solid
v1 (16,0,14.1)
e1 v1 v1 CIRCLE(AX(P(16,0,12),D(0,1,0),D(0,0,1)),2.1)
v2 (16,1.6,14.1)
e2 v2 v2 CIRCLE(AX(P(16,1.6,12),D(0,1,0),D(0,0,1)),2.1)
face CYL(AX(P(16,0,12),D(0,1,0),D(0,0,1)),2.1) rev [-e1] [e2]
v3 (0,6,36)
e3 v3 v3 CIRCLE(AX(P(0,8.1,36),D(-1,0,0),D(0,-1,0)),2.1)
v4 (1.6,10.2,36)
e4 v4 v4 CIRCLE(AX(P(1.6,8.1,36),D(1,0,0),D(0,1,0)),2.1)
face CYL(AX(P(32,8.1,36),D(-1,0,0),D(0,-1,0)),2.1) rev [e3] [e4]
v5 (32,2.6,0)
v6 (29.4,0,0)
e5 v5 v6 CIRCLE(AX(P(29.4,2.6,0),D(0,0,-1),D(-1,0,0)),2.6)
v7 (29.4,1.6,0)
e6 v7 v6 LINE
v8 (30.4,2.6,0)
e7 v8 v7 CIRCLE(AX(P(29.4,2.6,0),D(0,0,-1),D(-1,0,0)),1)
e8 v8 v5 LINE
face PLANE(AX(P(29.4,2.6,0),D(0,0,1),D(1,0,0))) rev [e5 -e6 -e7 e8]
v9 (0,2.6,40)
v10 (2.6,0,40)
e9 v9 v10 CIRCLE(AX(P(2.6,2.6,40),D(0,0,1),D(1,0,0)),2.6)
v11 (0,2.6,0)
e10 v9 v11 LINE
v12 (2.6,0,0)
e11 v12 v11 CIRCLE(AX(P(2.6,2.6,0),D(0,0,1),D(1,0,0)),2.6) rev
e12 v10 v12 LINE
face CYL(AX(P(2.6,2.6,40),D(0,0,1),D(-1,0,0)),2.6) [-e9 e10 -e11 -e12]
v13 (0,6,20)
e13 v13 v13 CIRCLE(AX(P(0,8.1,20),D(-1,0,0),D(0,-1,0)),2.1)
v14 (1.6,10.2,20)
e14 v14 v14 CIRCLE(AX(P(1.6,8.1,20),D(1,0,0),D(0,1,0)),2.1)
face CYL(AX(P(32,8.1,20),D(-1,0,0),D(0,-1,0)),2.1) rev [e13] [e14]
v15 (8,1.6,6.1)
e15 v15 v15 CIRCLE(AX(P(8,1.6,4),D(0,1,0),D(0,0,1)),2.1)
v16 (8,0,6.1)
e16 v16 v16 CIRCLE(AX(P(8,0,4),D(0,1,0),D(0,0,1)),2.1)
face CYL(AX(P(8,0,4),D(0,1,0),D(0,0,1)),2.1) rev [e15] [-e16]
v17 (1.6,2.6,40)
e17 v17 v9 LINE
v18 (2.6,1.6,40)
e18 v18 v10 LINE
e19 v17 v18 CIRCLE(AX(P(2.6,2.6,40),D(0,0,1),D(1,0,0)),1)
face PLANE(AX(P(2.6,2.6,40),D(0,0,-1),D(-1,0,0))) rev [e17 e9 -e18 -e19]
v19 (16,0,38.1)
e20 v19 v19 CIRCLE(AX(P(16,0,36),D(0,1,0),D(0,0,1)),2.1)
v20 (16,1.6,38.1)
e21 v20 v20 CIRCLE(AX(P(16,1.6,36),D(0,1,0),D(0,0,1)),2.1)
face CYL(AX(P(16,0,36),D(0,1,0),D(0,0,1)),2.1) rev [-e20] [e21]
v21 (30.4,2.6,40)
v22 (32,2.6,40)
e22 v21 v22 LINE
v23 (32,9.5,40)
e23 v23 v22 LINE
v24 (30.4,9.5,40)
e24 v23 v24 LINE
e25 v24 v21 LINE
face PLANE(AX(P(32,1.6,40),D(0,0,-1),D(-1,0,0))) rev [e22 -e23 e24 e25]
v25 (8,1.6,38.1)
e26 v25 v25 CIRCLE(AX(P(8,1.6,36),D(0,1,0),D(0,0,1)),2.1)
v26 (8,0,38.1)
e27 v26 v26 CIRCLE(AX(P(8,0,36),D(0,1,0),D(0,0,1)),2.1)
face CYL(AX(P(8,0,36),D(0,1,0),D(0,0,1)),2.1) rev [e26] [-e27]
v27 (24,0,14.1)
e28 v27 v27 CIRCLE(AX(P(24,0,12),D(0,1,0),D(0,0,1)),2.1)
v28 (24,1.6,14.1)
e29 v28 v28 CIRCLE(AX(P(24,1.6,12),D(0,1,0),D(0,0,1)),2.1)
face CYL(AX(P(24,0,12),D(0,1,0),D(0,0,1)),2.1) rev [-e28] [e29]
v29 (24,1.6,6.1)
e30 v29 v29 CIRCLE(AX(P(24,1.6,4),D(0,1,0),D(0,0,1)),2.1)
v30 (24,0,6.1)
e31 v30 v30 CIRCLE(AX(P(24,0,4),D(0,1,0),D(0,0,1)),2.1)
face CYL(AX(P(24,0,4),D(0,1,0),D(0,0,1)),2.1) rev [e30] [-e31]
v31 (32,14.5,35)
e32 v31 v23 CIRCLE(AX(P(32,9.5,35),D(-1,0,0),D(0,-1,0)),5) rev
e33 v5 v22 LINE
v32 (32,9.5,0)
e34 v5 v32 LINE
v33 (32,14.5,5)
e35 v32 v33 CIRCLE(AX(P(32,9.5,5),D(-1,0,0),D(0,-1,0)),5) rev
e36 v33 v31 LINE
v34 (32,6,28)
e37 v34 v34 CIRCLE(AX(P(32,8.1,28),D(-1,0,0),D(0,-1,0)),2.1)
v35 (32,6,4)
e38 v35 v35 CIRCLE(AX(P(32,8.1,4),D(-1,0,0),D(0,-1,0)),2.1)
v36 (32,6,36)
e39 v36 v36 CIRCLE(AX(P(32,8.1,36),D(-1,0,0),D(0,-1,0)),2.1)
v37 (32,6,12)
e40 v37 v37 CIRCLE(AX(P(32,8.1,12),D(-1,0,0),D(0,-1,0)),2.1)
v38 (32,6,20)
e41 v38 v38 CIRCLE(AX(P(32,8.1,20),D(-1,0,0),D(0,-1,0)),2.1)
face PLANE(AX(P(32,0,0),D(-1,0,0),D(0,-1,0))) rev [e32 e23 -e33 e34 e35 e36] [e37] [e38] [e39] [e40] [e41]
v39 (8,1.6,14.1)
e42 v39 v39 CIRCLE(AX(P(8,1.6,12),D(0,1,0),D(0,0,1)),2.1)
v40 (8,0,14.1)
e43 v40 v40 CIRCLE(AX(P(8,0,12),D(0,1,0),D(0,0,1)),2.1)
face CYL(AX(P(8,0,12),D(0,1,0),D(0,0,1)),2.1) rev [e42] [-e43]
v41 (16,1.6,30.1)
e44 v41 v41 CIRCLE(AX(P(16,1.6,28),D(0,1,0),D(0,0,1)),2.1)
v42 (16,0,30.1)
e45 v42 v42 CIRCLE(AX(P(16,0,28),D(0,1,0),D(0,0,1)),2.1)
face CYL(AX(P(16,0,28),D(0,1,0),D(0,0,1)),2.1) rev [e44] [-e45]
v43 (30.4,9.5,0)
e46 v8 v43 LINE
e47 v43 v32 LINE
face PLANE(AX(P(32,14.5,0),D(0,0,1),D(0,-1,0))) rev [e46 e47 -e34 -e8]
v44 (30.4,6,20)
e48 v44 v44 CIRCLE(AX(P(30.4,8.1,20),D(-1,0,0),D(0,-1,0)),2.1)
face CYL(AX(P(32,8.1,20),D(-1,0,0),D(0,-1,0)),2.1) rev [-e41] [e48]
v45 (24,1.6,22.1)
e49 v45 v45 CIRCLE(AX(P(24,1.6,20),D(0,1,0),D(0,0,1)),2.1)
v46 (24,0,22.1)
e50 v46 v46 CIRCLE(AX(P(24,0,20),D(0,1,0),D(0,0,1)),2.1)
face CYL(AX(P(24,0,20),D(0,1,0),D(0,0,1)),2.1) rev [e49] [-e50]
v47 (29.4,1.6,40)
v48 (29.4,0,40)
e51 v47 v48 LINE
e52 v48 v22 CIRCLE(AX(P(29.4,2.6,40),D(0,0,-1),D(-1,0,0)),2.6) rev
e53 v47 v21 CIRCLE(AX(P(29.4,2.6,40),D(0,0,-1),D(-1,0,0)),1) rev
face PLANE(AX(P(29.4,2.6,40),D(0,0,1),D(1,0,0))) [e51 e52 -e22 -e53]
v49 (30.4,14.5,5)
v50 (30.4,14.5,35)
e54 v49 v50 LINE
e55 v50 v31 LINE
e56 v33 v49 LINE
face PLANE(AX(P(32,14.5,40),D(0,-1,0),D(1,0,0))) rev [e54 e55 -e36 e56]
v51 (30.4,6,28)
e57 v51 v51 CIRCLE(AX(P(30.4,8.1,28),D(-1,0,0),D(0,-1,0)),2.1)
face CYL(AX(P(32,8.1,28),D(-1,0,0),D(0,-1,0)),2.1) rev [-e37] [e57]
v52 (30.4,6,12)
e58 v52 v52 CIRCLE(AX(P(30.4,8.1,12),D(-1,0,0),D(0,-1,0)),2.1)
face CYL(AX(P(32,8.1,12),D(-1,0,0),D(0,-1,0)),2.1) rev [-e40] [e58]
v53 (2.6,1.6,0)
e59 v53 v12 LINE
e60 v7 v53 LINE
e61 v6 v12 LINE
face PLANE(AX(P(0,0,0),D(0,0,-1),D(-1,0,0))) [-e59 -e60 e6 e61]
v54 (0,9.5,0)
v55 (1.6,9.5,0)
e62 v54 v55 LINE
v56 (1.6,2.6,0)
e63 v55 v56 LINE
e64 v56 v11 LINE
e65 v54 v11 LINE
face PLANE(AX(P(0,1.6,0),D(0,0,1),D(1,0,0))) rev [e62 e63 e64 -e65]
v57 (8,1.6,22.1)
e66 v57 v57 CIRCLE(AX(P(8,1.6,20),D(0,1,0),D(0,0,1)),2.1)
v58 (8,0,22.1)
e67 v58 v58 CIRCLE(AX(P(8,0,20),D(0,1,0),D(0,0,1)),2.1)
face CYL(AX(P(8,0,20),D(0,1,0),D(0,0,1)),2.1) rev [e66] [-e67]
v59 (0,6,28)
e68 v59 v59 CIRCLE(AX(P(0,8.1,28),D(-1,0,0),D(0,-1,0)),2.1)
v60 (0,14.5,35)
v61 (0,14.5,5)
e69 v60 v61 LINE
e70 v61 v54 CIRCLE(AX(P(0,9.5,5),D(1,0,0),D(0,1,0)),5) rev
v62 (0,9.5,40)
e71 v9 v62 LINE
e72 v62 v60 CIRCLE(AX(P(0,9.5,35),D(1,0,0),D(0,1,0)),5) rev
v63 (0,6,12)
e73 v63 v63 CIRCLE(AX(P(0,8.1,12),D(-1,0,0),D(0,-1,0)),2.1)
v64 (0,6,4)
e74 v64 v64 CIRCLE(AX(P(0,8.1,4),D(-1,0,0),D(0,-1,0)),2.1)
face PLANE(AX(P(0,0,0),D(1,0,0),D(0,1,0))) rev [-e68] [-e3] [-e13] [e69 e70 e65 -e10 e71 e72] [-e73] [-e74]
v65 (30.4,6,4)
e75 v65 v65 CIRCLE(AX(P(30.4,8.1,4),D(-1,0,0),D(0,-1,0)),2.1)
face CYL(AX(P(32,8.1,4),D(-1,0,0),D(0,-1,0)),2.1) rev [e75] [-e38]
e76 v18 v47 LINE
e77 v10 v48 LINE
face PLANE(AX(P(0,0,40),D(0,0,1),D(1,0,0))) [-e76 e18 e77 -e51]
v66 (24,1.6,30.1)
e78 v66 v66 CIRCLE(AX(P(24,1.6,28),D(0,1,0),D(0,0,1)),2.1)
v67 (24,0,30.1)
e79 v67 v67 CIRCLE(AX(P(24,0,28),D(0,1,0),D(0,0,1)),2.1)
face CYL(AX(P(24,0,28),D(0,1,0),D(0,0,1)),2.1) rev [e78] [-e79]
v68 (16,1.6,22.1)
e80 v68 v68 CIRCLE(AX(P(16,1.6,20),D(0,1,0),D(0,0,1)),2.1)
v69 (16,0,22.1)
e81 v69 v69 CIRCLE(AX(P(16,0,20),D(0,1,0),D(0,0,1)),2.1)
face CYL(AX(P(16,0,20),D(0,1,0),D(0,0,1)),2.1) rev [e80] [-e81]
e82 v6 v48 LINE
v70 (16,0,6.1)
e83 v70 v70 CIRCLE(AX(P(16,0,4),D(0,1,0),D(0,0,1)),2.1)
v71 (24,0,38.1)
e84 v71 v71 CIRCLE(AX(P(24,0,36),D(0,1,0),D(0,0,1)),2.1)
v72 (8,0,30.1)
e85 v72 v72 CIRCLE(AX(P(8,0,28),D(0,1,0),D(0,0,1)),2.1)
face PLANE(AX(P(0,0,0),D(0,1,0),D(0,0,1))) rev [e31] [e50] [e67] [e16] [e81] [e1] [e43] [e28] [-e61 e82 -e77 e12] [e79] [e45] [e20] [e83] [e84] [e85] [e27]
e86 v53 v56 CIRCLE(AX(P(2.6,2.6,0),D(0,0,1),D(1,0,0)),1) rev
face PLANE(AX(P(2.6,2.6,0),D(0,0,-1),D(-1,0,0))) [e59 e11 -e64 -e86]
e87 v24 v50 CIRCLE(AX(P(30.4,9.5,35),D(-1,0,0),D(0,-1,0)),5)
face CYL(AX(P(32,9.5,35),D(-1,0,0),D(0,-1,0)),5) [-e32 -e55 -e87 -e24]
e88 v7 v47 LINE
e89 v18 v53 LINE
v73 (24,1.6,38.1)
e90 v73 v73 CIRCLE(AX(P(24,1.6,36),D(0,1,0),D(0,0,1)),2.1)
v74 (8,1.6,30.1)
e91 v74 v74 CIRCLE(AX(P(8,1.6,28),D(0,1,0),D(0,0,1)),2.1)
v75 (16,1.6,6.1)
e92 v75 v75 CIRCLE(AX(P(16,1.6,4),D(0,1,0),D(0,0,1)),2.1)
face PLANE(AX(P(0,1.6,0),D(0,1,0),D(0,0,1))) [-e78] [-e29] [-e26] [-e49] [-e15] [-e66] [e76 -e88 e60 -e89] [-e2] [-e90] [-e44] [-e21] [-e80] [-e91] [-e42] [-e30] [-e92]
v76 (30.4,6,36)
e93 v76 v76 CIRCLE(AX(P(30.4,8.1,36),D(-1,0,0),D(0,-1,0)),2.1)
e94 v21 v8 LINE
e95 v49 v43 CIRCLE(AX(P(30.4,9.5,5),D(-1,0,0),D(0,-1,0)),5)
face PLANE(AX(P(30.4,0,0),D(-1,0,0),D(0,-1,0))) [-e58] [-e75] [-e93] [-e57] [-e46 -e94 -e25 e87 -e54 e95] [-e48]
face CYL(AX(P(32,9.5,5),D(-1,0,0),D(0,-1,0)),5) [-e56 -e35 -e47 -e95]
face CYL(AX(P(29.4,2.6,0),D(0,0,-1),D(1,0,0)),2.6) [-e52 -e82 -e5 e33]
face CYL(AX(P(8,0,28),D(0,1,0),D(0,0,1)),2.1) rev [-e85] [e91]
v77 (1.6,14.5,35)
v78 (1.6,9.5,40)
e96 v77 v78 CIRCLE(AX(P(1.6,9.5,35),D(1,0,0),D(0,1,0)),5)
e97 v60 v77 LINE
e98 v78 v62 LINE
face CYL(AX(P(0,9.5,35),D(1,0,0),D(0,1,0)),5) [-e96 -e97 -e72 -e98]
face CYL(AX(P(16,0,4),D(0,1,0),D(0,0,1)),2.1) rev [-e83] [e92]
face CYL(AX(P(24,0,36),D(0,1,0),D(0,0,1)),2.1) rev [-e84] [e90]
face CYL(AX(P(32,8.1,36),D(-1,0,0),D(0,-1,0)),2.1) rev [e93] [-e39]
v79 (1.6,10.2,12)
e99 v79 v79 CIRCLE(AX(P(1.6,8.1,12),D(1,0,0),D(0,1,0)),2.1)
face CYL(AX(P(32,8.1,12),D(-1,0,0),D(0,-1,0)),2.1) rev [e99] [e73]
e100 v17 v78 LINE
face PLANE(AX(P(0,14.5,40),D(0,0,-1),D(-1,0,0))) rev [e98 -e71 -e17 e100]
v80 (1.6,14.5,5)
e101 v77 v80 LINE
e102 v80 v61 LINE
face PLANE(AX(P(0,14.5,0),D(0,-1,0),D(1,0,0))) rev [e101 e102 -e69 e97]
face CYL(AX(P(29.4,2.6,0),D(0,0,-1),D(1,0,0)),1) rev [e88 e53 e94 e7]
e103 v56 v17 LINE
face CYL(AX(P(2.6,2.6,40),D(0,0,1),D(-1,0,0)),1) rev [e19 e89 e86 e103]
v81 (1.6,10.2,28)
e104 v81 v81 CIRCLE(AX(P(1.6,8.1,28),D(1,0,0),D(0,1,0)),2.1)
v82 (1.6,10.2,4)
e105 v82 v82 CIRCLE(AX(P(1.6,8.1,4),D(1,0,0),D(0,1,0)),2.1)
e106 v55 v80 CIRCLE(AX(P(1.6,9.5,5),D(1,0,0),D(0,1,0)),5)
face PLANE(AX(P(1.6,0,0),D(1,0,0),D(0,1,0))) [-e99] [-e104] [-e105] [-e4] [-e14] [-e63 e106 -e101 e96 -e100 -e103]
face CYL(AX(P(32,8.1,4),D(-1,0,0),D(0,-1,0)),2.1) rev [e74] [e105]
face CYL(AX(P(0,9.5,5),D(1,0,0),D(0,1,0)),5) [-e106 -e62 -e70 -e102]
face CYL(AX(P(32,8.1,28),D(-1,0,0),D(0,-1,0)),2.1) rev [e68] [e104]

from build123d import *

# Parameters (mm, degrees)
SKETCH1_W                      = 32
SKETCH1_H                      = 40
BOSS_EXTRUDE1_DEPTH            = 1.6
SKETCH2_R                      = 2.1
CUT_EXTRUDE1_DEPTH             = 52.24997561
LPATTERN1_COUNT                = 3
LPATTERN1_PITCH                = 8
LPATTERN1_COUNT_DIR2           = 5
LPATTERN1_PITCH_DIR2           = 8
EDGE_FLANGE1_STRIP_W           = 8.4
EDGE_FLANGE1_STRIP_H           = 1.6
EDGE_FLANGE1_STRIP_CUT_DEPTH   = 40
EDGE_FLANGE1_STRIP_2_W         = 8.4
EDGE_FLANGE1_STRIP_2_H         = 1.6
EDGE_FLANGE1_STRIP_CUT_2_DEPTH = 40
EDGE_FLANGE1_DEPTH             = 40
EDGE_FLANGE1_BEND_DEPTH        = 40
FILLET1_R                      = 5
SKETCH14_R                     = 2.1
CUT_EXTRUDE2_DEPTH             = 54.23767463
LPATTERN2_COUNT                = 5
LPATTERN2_PITCH                = 8


# Sheet-metal steps are written as plain solids
with BuildPart() as part:
    # Sketch1 → Boss-Extrude1 (new body)
    with BuildSketch(Plane(origin=(0, 0, 0), x_dir=(1, 0, 0), z_dir=(0, 1, 0))):
        with Locations((16, -20)):
            Rectangle(SKETCH1_W, SKETCH1_H)
    extrude(amount=BOSS_EXTRUDE1_DEPTH)

    # Sketch2 → Cut-Extrude1 (cut, through all)
    with BuildSketch(Plane(origin=(0, 1.6, 0), x_dir=(1, 0, 0), z_dir=(0, 1, 0))):
        with Locations(Location((8, -4, 0), (0, 0, 270))):
            Circle(SKETCH2_R)
    cut_extrude1 = extrude(amount=-CUT_EXTRUDE1_DEPTH, mode=Mode.SUBTRACT)

    # LPattern1: Cut-Extrude1 3 × 5
    with Locations(*[(i * LPATTERN1_PITCH, 0, j * LPATTERN1_PITCH_DIR2) for i in range(LPATTERN1_COUNT) for j in range(LPATTERN1_COUNT_DIR2) if (i, j) != (0, 0)]):
        add(cut_extrude1, mode=Mode.SUBTRACT)

    # Edge-Flange1 strip (across the edge) → Edge-Flange1 strip cut (cut)
    with BuildSketch(Plane(origin=(32, 1.6, 40), x_dir=(-1, 0, 0), z_dir=(0, 0, -1))):
        with Locations((-1.6, -0.8)):
            Rectangle(EDGE_FLANGE1_STRIP_W, EDGE_FLANGE1_STRIP_H)
    extrude(amount=EDGE_FLANGE1_STRIP_CUT_DEPTH, mode=Mode.SUBTRACT)

    # Edge-Flange1 strip 2 (across the edge) → Edge-Flange1 strip cut 2 (cut)
    with BuildSketch(Plane(origin=(0, 1.6, 0), x_dir=(1, 0, 0), z_dir=(0, 0, 1))):
        with Locations((-1.6, -0.8)):
            Rectangle(EDGE_FLANGE1_STRIP_2_W, EDGE_FLANGE1_STRIP_2_H)
    extrude(amount=EDGE_FLANGE1_STRIP_CUT_2_DEPTH, mode=Mode.SUBTRACT)

    # Edge-Flange1 section (across the edge) → Edge-Flange1 (add)
    with BuildSketch(Plane(origin=(32, 1.6, 40), x_dir=(-1, 0, 0), z_dir=(0, 0, -1))):
        with BuildLine():
            Line((0, 1), (0, 12.9))
            Line((0, 12.9), (1.6, 12.9))
            Line((1.6, 12.9), (1.6, 1))
            ThreePointArc((1.6, 1), (1.892893219, 0.292893219), (2.6, 0))
            Line((2.6, 0), (2.6, -1.6))
            ThreePointArc((2.6, -1.6), (0.761522369, -0.838477631), (0, 1))
        make_face()
    extrude(amount=EDGE_FLANGE1_DEPTH)

    # Edge-Flange1 section 2 (across the edge) → Edge-Flange1 bend (add)
    with BuildSketch(Plane(origin=(0, 1.6, 0), x_dir=(1, 0, 0), z_dir=(0, 0, 1))):
        with BuildLine():
            Line((0, 1), (0, 12.9))
            Line((0, 12.9), (1.6, 12.9))
            Line((1.6, 12.9), (1.6, 1))
            ThreePointArc((1.6, 1), (1.892893219, 0.292893219), (2.6, 0))
            Line((2.6, 0), (2.6, -1.6))
            ThreePointArc((2.6, -1.6), (0.761522369, -0.838477631), (0, 1))
        make_face()
    extrude(amount=EDGE_FLANGE1_BEND_DEPTH)

    # Fillet1
    fillet1_edges = [part.edges().sort_by_distance(p)[0] for p in [
        (31.2, 14.5, 40),
        (31.2, 14.5, 0),
        (0.8, 14.5, 0),
        (0.8, 14.5, 40),
    ]]
    fillet(fillet1_edges, radius=FILLET1_R)

    # Sketch14 → Cut-Extrude2 (cut, through all)
    with BuildSketch(Plane.ZY):
        with Locations(Location((4, 8.1, 0), (0, 0, 270))):
            Circle(SKETCH14_R)
    cut_extrude2 = extrude(amount=-CUT_EXTRUDE2_DEPTH, mode=Mode.SUBTRACT)

    # LPattern2: Cut-Extrude2 ×5
    with Locations(*[(0, 0, i * LPATTERN2_PITCH) for i in range(1, LPATTERN2_COUNT)]):
        add(cut_extrude2, mode=Mode.SUBTRACT)


solid = part.part
